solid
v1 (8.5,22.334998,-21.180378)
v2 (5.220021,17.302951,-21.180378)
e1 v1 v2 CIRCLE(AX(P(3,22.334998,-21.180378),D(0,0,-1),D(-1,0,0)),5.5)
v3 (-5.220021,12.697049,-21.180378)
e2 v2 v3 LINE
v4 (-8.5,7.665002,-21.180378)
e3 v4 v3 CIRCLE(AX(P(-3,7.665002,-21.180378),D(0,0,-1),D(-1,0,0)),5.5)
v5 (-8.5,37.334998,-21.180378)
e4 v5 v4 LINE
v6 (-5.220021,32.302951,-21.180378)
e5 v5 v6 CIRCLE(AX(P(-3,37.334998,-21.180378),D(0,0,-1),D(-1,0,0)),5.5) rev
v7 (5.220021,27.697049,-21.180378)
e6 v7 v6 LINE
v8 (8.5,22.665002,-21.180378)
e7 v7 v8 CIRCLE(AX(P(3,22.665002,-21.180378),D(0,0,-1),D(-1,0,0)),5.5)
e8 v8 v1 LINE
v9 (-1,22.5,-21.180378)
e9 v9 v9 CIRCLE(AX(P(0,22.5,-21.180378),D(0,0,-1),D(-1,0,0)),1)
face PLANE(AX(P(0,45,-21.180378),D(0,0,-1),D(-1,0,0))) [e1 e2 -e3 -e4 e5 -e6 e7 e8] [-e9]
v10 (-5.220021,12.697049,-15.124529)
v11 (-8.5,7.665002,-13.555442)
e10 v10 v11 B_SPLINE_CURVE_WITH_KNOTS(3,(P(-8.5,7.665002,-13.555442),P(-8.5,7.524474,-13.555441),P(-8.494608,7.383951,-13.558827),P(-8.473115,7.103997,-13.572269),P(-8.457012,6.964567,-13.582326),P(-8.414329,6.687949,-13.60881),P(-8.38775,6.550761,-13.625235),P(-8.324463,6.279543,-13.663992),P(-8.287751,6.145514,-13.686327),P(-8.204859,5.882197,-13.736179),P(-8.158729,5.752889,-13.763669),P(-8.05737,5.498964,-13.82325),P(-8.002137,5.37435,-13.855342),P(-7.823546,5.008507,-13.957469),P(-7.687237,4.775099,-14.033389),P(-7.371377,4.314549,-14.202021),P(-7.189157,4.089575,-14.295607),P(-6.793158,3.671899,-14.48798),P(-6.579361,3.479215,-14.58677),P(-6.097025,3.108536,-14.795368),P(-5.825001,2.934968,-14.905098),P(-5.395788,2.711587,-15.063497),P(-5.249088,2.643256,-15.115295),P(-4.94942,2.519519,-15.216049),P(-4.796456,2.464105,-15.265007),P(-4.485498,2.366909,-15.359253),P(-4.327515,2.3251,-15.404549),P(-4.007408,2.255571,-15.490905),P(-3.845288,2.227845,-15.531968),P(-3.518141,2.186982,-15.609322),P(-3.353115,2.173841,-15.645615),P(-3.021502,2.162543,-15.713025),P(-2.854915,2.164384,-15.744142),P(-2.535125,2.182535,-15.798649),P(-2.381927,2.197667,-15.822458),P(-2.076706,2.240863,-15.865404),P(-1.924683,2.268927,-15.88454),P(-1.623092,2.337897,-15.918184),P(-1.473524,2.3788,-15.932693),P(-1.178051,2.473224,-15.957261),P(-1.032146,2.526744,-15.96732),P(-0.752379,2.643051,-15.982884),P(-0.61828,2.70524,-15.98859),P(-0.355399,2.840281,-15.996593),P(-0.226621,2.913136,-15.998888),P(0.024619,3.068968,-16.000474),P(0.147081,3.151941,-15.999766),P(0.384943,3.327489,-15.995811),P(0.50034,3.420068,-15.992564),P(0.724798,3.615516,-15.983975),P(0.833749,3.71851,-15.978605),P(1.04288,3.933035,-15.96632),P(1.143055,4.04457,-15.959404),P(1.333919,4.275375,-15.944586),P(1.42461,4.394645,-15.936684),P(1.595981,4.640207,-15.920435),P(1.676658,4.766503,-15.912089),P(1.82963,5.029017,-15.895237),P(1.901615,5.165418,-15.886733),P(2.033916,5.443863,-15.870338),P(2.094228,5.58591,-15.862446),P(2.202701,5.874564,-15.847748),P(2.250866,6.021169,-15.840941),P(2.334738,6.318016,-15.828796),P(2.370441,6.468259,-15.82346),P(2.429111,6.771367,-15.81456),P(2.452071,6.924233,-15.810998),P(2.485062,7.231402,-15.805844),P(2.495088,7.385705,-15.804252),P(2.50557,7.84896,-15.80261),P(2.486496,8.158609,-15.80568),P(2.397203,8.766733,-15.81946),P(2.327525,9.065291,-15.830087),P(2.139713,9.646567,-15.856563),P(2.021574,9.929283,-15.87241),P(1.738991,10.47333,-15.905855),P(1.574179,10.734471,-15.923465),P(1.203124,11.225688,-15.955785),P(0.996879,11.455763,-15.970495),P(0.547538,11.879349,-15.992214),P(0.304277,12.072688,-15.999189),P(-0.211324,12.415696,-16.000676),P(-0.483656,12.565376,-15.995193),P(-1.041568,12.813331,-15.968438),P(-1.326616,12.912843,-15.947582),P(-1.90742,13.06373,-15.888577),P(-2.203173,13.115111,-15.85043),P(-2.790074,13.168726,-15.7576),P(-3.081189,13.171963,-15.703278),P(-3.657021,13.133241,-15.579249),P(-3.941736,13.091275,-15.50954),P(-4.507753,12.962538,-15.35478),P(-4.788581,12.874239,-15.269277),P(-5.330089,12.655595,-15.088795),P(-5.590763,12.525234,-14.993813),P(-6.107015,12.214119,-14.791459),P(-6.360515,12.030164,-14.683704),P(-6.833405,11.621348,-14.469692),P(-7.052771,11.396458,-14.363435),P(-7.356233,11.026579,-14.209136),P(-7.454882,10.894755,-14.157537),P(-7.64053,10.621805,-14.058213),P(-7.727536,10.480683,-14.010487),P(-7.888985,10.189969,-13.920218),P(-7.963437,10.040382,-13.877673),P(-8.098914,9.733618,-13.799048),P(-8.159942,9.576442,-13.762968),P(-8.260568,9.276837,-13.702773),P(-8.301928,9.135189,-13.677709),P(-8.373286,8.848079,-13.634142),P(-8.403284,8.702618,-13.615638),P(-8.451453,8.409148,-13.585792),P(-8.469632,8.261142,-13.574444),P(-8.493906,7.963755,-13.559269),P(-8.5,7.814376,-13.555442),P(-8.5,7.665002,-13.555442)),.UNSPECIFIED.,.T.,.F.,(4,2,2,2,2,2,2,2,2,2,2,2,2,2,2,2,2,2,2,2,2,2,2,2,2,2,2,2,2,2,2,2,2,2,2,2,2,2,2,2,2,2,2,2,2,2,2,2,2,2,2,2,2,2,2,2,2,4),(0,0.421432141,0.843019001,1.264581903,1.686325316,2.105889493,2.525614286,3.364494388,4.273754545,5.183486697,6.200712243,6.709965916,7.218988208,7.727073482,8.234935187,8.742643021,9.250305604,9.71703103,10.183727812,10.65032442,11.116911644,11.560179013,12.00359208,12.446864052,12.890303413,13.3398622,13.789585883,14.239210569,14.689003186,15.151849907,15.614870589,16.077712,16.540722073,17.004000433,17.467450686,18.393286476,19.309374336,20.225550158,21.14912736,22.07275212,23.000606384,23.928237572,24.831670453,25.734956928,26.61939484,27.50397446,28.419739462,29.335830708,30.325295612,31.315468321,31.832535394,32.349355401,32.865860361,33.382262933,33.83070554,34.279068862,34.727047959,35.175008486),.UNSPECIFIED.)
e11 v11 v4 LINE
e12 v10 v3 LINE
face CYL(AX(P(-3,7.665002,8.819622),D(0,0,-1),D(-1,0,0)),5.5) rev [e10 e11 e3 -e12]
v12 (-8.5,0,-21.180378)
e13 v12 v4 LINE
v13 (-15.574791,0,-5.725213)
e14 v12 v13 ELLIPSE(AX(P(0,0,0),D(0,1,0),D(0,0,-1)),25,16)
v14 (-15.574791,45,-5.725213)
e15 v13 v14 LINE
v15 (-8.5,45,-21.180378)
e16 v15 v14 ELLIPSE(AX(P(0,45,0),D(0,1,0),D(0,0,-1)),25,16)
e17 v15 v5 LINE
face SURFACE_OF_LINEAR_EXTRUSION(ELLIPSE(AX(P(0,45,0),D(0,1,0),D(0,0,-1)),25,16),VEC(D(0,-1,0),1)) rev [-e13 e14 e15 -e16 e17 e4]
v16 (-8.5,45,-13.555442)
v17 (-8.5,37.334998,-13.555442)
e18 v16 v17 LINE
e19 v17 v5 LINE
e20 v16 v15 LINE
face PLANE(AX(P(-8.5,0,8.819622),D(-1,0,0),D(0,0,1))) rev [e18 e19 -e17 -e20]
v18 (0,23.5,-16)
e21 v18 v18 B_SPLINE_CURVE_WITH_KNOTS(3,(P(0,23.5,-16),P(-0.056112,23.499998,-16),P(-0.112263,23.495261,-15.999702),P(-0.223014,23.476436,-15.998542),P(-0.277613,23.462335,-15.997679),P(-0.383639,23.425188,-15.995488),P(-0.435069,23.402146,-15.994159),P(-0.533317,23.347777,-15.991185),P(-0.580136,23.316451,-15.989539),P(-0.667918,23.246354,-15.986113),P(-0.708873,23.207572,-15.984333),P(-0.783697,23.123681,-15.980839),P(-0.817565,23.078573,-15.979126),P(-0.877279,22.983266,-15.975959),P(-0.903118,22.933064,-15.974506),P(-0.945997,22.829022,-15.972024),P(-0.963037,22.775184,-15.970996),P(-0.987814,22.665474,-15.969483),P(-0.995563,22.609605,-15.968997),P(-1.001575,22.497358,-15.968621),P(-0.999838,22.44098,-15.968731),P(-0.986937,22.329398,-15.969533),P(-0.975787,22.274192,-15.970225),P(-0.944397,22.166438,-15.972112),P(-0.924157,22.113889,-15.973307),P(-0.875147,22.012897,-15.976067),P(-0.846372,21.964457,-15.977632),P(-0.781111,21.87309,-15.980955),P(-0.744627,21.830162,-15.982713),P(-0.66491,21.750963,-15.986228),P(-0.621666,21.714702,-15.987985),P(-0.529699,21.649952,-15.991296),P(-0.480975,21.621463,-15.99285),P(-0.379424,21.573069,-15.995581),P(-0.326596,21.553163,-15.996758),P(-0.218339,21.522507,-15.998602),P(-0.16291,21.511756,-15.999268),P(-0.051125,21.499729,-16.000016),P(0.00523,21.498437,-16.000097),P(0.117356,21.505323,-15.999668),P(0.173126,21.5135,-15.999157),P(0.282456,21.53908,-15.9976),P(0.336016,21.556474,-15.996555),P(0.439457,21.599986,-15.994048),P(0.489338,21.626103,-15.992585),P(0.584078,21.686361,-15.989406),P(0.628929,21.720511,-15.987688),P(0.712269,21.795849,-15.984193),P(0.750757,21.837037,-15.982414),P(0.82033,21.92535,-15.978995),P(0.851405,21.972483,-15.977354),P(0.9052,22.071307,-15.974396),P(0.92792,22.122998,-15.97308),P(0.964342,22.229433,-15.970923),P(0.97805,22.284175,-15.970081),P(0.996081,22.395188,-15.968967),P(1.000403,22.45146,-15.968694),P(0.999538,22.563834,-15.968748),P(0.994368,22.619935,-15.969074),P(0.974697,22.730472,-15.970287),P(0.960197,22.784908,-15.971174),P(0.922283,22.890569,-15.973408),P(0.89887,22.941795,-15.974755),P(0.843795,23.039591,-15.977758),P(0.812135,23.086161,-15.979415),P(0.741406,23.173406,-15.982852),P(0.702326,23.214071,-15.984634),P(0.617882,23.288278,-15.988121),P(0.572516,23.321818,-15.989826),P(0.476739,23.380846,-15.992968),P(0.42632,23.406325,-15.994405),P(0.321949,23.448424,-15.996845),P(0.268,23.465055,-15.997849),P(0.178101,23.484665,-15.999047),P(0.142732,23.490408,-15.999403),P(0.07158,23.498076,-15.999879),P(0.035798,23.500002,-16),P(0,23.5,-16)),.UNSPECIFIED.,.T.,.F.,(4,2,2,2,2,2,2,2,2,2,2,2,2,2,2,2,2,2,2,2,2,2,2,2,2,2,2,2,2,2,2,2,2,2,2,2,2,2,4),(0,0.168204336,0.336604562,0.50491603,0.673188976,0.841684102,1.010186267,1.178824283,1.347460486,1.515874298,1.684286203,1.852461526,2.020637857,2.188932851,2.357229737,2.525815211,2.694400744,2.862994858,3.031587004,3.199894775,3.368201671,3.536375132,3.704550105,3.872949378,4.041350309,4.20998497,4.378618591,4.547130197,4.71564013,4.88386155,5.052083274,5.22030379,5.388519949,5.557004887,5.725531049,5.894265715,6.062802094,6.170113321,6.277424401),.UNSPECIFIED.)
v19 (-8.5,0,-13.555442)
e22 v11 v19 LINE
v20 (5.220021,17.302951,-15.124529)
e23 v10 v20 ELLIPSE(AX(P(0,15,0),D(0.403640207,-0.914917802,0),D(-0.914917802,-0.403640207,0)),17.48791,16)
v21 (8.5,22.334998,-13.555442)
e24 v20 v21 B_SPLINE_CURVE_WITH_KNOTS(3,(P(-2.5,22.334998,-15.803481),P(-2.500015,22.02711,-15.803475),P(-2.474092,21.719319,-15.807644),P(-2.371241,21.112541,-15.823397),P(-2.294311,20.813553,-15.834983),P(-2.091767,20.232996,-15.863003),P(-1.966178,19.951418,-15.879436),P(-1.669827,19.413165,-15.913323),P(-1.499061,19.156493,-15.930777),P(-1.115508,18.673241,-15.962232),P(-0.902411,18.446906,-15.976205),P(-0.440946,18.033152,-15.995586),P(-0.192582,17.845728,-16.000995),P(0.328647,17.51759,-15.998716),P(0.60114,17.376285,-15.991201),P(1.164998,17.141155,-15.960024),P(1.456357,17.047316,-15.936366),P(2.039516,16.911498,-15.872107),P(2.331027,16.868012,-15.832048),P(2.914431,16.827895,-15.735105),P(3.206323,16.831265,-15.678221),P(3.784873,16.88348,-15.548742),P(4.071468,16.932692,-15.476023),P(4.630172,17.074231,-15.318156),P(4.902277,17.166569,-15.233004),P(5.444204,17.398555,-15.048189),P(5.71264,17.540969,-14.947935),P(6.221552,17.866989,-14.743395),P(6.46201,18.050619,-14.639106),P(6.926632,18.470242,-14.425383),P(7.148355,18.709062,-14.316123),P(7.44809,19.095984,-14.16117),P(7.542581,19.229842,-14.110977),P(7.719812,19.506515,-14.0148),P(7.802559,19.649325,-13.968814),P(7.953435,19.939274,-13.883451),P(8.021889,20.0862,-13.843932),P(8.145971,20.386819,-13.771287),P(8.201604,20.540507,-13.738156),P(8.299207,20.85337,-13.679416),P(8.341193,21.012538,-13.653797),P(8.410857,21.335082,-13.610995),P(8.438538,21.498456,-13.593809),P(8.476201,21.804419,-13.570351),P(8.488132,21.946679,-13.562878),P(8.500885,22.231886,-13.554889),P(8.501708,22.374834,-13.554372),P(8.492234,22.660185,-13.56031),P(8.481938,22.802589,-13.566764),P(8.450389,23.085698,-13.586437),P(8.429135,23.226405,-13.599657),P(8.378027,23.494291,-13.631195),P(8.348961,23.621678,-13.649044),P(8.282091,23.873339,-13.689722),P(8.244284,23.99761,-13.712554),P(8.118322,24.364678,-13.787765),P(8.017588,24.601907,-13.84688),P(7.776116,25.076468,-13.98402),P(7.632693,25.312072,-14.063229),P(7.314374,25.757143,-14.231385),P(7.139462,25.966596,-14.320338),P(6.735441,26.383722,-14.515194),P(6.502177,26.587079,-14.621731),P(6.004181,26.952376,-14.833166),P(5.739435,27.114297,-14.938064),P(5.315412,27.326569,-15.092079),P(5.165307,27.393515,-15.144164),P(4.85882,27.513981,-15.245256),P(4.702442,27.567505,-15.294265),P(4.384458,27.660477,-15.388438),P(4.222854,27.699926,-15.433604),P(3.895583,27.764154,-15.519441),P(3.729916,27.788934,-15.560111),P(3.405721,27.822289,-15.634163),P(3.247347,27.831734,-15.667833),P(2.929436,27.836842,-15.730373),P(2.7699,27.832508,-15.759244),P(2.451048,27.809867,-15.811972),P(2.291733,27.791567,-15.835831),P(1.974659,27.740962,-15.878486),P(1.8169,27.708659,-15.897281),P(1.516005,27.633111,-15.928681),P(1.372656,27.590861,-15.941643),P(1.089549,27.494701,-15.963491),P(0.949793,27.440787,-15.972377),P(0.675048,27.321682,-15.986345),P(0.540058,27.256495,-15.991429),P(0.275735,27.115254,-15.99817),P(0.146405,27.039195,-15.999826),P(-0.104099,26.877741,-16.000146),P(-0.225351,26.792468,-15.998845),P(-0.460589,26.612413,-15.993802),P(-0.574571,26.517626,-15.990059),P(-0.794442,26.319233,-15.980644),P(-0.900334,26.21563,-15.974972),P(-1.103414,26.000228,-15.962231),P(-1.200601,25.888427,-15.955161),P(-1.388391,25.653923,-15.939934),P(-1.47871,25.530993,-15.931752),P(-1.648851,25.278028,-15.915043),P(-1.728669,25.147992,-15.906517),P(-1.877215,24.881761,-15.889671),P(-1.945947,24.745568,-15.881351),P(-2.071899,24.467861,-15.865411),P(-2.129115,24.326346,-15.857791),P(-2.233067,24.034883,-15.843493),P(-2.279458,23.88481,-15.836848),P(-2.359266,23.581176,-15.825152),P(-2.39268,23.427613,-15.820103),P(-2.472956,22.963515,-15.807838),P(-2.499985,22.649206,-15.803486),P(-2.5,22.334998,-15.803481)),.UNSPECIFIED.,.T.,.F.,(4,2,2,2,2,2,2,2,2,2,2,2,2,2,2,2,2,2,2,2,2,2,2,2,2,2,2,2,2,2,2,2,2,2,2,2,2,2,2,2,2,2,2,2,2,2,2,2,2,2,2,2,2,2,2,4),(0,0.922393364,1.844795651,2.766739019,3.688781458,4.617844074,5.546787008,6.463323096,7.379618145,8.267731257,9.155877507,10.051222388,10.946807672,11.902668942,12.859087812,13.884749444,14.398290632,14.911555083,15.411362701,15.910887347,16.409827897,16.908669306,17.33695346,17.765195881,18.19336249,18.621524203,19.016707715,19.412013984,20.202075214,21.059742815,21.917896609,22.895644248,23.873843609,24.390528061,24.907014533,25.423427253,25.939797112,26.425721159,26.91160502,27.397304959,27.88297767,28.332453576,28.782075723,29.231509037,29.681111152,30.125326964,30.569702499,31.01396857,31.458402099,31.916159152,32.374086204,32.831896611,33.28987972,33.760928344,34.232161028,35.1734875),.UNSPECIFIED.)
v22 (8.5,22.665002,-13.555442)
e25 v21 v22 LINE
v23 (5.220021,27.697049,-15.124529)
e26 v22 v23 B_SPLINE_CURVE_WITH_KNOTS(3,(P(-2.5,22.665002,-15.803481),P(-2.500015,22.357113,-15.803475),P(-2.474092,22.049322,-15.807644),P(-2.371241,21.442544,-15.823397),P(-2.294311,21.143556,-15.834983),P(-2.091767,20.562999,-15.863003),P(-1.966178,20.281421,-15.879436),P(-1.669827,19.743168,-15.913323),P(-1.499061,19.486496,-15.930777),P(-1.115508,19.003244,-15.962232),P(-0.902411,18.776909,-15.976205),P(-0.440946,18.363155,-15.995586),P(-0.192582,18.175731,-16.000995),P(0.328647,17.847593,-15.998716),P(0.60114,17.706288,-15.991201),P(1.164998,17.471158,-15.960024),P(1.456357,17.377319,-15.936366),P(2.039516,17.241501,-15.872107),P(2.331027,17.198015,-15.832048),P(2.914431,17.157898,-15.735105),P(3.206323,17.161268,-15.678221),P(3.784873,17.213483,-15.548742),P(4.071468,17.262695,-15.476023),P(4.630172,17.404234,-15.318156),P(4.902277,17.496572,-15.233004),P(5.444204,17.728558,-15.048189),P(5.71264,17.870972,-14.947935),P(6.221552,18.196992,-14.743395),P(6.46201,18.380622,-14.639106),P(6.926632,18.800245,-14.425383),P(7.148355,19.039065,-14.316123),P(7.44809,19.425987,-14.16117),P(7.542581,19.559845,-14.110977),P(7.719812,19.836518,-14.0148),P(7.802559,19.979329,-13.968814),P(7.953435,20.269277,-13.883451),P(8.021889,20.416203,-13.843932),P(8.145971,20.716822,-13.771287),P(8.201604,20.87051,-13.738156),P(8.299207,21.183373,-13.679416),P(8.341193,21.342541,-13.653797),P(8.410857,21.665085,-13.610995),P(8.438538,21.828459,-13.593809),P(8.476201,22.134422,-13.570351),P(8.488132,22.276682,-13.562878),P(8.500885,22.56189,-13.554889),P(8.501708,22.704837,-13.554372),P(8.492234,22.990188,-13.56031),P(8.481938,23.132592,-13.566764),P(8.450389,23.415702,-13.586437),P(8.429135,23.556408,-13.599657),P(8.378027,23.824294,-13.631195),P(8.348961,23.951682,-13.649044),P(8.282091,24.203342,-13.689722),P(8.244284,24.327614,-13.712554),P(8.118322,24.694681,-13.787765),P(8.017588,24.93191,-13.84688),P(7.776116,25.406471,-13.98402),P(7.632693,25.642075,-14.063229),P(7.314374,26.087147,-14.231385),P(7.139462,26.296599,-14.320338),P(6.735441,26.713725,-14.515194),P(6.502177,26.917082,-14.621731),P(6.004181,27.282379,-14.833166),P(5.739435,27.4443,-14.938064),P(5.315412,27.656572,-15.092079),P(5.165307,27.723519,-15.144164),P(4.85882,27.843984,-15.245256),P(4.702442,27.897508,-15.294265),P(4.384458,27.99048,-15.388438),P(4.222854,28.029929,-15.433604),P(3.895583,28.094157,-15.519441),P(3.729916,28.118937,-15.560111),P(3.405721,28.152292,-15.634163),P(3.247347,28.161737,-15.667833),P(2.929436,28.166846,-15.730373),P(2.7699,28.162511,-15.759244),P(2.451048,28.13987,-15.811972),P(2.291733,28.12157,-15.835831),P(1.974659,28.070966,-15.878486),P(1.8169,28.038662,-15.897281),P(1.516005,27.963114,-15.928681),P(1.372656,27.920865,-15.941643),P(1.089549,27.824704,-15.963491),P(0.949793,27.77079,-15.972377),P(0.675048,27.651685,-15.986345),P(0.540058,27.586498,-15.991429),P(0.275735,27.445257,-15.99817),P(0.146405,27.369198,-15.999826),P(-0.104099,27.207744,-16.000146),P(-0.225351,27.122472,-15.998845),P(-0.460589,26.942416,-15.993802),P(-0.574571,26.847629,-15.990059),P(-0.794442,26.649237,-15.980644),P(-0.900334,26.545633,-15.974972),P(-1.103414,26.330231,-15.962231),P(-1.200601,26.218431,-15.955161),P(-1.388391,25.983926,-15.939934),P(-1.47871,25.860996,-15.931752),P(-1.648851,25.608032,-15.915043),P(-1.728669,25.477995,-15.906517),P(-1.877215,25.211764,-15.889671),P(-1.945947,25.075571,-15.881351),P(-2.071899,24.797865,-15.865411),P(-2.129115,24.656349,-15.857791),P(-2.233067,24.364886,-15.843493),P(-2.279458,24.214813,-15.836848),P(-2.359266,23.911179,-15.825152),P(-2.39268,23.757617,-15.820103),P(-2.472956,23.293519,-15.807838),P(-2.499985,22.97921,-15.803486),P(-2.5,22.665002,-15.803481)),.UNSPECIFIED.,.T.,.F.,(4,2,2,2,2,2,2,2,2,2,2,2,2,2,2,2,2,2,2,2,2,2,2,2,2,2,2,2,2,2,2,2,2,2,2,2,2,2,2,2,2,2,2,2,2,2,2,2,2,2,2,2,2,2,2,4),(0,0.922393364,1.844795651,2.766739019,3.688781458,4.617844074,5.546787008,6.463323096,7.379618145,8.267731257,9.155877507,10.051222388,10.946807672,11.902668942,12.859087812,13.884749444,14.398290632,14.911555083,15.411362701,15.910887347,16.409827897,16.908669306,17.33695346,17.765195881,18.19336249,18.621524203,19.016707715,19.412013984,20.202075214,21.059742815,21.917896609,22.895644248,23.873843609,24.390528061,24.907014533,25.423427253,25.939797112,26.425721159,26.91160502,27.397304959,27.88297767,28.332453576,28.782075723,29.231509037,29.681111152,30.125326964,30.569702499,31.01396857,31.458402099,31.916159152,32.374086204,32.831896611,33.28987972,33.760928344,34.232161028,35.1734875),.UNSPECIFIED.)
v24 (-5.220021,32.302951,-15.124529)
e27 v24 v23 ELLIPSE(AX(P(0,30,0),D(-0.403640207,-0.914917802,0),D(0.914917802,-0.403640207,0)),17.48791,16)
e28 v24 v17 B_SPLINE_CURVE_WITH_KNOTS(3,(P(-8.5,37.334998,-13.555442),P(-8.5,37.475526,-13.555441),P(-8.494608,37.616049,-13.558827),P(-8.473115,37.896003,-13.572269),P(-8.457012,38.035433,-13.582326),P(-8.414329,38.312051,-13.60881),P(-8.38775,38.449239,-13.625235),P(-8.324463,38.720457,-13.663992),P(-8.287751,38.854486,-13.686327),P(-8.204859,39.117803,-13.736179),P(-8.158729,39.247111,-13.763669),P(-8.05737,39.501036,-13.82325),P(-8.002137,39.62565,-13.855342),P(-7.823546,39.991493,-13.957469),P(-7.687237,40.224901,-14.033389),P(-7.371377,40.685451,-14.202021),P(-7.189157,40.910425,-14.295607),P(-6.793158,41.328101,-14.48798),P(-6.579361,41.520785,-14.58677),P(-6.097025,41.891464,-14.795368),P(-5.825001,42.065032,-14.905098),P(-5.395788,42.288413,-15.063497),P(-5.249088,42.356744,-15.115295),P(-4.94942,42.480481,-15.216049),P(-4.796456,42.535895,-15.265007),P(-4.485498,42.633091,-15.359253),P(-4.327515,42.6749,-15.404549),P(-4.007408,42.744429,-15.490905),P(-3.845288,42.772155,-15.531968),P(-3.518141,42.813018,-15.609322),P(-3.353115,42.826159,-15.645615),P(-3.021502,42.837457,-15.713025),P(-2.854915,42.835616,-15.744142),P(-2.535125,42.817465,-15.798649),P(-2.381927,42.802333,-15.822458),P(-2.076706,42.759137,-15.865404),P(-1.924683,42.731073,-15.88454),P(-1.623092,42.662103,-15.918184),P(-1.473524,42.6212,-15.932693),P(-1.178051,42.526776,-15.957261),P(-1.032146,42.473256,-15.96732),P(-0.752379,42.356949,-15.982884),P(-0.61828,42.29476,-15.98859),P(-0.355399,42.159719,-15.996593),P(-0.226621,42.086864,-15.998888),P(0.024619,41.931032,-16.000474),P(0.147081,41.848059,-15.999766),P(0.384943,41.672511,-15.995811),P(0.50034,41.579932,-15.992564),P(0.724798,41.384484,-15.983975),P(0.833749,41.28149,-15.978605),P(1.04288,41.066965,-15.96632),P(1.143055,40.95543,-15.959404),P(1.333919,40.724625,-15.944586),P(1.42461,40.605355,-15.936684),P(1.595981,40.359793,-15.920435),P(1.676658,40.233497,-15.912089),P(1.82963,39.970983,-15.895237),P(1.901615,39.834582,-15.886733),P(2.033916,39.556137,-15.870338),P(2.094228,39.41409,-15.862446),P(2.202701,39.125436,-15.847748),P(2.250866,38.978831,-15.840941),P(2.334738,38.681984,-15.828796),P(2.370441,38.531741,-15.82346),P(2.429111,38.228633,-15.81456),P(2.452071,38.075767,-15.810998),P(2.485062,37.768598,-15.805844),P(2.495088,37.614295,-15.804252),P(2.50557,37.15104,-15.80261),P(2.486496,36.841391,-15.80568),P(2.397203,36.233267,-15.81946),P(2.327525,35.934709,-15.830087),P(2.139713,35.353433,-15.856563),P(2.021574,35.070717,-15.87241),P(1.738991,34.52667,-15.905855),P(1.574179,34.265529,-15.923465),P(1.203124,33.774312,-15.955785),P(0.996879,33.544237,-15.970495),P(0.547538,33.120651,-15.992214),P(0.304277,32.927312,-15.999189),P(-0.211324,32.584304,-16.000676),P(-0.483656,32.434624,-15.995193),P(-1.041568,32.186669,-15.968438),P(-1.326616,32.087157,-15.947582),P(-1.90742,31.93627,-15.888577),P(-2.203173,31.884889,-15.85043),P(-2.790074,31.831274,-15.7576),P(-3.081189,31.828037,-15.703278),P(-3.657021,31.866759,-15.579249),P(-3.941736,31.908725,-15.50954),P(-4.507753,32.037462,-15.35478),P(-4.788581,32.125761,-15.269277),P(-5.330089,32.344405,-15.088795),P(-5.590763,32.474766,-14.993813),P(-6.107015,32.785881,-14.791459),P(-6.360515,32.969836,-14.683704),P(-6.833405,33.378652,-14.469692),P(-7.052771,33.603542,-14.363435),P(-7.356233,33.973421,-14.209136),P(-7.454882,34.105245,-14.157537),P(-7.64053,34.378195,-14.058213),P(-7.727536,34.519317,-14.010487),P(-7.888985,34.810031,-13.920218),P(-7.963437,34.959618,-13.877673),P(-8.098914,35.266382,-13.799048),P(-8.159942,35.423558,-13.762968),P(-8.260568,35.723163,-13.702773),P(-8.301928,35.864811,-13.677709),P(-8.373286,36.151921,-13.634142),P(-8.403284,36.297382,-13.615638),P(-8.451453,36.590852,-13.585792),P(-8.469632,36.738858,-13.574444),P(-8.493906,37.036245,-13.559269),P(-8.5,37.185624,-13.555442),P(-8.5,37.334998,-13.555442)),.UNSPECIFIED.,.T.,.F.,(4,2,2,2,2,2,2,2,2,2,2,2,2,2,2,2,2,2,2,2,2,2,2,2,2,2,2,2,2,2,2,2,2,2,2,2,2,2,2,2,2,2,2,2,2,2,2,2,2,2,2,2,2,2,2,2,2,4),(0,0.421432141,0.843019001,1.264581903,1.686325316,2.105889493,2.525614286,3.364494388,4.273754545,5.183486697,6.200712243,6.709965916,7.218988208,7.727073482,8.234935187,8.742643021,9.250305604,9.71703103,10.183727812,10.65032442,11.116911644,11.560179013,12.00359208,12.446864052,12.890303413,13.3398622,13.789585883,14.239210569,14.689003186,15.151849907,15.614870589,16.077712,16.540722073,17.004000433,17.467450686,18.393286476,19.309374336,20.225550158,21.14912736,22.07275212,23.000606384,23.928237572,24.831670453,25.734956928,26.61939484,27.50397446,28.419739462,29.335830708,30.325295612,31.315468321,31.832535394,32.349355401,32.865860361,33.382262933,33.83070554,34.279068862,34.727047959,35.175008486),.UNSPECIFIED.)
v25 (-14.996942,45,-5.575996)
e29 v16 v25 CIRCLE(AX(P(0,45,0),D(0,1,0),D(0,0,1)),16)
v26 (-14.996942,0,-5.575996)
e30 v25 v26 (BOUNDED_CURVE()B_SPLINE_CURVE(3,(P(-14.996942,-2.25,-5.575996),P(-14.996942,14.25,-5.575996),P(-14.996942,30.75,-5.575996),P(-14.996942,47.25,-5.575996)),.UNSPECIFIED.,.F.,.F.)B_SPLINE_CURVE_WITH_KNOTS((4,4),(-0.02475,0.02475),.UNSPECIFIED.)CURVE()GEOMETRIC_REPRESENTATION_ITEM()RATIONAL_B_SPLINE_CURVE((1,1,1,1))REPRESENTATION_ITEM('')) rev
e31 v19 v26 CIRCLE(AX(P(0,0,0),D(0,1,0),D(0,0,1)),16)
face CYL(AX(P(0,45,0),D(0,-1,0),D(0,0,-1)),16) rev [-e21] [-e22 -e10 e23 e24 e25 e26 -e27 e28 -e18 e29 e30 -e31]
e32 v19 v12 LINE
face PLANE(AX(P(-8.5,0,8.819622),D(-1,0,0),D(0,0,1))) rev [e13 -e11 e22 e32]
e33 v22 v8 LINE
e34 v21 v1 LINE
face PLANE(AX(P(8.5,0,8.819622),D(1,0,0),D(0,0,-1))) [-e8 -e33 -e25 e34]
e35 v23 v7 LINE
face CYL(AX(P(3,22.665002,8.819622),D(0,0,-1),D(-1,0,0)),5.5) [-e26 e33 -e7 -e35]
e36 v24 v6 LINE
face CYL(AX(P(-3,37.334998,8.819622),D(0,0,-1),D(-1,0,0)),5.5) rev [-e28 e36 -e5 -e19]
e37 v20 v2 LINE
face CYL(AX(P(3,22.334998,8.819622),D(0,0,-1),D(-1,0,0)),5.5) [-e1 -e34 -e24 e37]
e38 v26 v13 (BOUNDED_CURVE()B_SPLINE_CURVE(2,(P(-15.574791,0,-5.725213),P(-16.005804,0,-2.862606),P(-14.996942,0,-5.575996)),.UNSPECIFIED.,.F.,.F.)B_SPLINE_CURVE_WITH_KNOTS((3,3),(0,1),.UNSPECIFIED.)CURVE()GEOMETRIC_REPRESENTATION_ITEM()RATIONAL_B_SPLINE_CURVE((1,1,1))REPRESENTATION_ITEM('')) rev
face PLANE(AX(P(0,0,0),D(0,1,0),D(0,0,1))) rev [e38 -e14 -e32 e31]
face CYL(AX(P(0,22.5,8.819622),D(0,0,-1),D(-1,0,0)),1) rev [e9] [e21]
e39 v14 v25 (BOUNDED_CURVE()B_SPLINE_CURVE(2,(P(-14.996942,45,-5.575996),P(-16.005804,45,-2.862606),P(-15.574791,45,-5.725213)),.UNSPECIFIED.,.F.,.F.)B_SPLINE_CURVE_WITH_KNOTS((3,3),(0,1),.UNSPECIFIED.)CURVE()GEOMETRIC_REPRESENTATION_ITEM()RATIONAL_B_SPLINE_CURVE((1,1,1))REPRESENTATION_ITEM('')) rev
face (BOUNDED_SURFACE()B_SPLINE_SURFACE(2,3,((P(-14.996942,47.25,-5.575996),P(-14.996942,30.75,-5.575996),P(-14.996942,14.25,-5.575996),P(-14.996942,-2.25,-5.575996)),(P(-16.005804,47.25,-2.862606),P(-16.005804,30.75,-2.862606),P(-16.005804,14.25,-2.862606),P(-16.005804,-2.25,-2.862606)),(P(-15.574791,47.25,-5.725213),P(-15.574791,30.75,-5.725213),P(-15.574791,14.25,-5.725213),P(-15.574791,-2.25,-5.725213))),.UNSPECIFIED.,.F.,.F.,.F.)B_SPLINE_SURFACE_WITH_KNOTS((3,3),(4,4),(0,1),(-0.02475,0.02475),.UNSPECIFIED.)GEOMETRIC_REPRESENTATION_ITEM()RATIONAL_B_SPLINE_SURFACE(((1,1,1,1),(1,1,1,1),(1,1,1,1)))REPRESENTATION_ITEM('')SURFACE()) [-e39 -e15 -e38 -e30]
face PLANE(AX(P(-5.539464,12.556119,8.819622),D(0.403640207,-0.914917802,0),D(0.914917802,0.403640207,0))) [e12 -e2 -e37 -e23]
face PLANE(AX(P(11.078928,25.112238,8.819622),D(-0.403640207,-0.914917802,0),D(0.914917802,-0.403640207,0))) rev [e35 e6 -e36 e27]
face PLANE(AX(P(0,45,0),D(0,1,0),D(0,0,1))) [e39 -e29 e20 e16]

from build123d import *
from OCP.BRepAlgoAPI import BRepAlgoAPI_Cut
from OCP.TopTools import TopTools_ListOfShape

# Parameters (mm, degrees)
BOSS_EXTRUDE1_DEPTH = 45
FILLET1_START       = -1
FILLET1_DEPTH       = 47
SKETCH2_R           = 1
CUT_EXTRUDE3_DEPTH  = 30


with BuildPart() as part:
    # Sketch1 → Boss-Extrude1 (new body)
    with BuildSketch(Plane(origin=(0, 0, 0), x_dir=(1, 0, 0), z_dir=(0, 1, 0))):
        with BuildLine():
            add(Edge.make_bspline(
                [(-8.5, 21.180377675), (-16, 13.832083379), (-16, 0)],
                knots=[0.560075306, 0.560075306, 0.560075306, 1.570796327, 1.570796327, 1.570796327], degree=2, weights=[1, 0.875, 1]))
            ThreePointArc((-16, 0), (0, 16), (16, 0))
            add(Edge.make_bspline(
                [(16, 0), (16, 13.832083379), (8.5, 21.180377675)],
                knots=[4.71238898, 4.71238898, 4.71238898, 5.723110001, 5.723110001, 5.723110001], degree=2, weights=[1, 0.875, 1]))
            Line((8.5, 21.180377675), (-8.5, 21.180377675))
        make_face()
    extrude(amount=BOSS_EXTRUDE1_DEPTH)


with BuildPart() as fillet1_tool:
    # Fillet1: read off the stored shape, not the designer's step
    # Fillet1 outline → Fillet1 (new body)
    with BuildSketch(Plane(origin=(0, 0, 0), x_dir=(1, 0, 0), z_dir=(0, 1, 0)).offset(FILLET1_START)):
        with BuildLine():
            ThreePointArc((-16, 0), (-15.747238962, 2.832748677), (-14.996941867, 5.575996291))
            add(Edge.make_bspline(
                [(-14.996941867, 5.575996291), (-16.005804346, 2.862606405), (-15.574790718, 5.72521281)],
                knots=[0, 0, 0, 1, 1, 1], degree=2))
            add(Edge.make_bspline(
                [(-15.574790718, 5.72521281), (-16, 2.901156362), (-16, 0)],
                knots=[1.335570419, 1.335570419, 1.335570419, 1.570796327, 1.570796327, 1.570796327], degree=2, weights=[0.955358207, 0.97090865, 1]))
        make_face()
        with BuildLine():
            add(Edge.make_bspline(
                [(15.574790718, 5.72521281), (16.005804346, 2.862606405), (14.996941867, 5.575996291)],
                knots=[0, 0, 0, 1, 1, 1], degree=2))
            ThreePointArc((14.996941867, 5.575996291), (15.747238962, 2.832748677), (16, 0))
            add(Edge.make_bspline(
                [(16, 0), (16, 2.901156362), (15.574790718, 5.72521281)],
                knots=[4.71238898, 4.71238898, 4.71238898, 4.947614888, 4.947614888, 4.947614888], degree=2, weights=[1, 0.97090865, 0.955358207]))
        make_face()
    extrude(amount=FILLET1_DEPTH)


with BuildPart() as part_1:
    add(part.part)

    # Fillet1: cut by fillet1_tool, with a tolerance
    fillet1_stock = TopTools_ListOfShape()
    fillet1_stock.Append(part_1.part.wrapped)
    fillet1_tools = TopTools_ListOfShape()
    fillet1_tools.Append(fillet1_tool.part.wrapped)
    fillet1_cut = BRepAlgoAPI_Cut()
    fillet1_cut.SetArguments(fillet1_stock)
    fillet1_cut.SetTools(fillet1_tools)
    fillet1_cut.SetFuzzyValue(0.00001)
    fillet1_cut.Build()
    add(Compound.cast(fillet1_cut.Shape()).solids(), mode=Mode.REPLACE)

    # Sketch2 → Cut-Extrude3 (cut)
    # profile 1 of 6: a face of its own
    with BuildSketch(Plane(origin=(0, 0, -21.180377675), x_dir=(-1, 0, 0), z_dir=(0, 0, -1))):
        Polygon((-8.5, 22.33499841), (-8.5, 22.66500159), (-8.5, 45), (-34.986586565, 45), (-34.986586565, 0), (-8.5, 0), align=None)
    # profile 2 of 6: a face of its own
    with BuildSketch(Plane(origin=(0, 0, -21.180377675), x_dir=(-1, 0, 0), z_dir=(0, 0, -1))):
        with BuildLine():
            ThreePointArc((-8.5, 22.66500159), (-7.607608721, 25.668323397), (-5.220021136, 27.697049499))
            Line((-5.220021136, 27.697049499), (5.220021136, 32.302950501))
            ThreePointArc((5.220021136, 32.302950501), (7.607608721, 34.331676603), (8.5, 37.33499841))
            Line((8.5, 37.33499841), (8.5, 45))
            Line((8.5, 45), (-8.5, 45))
            Line((-8.5, 45), (-8.5, 22.66500159))
        make_face()
        with Locations((0, 37.5)):
            Circle(SKETCH2_R, mode=Mode.SUBTRACT)
    # profile 3 of 6: a face of its own
    with BuildSketch(Plane(origin=(0, 0, -21.180377675), x_dir=(-1, 0, 0), z_dir=(0, 0, -1))):
        with Locations((0, 37.5)):
            Circle(SKETCH2_R)
    # profile 4 of 6: a face of its own
    with BuildSketch(Plane(origin=(0, 0, -21.180377675), x_dir=(-1, 0, 0), z_dir=(0, 0, -1))):
        with Locations((0, 22.5)):
            Circle(SKETCH2_R)
    # profile 5 of 6: a face of its own
    with BuildSketch(Plane(origin=(0, 0, -21.180377675), x_dir=(-1, 0, 0), z_dir=(0, 0, -1))):
        with BuildLine():
            ThreePointArc((-5.220021136, 17.302950501), (-7.607608721, 19.331676603), (-8.5, 22.33499841))
            Line((-8.5, 22.33499841), (-8.5, 0))
            Line((-8.5, 0), (8.5, 0))
            Line((8.5, 0), (8.5, 7.66500159))
            ThreePointArc((8.5, 7.66500159), (7.607608721, 10.668323397), (5.220021136, 12.697049499))
            Line((5.220021136, 12.697049499), (-5.220021136, 17.302950501))
        make_face()
        with Locations((0, 7.5)):
            Circle(SKETCH2_R, mode=Mode.SUBTRACT)
    # profile 6 of 6: a face of its own
    with BuildSketch(Plane(origin=(0, 0, -21.180377675), x_dir=(-1, 0, 0), z_dir=(0, 0, -1))):
        with Locations((0, 7.5)):
            Circle(SKETCH2_R)
    extrude(amount=-CUT_EXTRUDE3_DEPTH, mode=Mode.SUBTRACT)


solid = part_1.part
